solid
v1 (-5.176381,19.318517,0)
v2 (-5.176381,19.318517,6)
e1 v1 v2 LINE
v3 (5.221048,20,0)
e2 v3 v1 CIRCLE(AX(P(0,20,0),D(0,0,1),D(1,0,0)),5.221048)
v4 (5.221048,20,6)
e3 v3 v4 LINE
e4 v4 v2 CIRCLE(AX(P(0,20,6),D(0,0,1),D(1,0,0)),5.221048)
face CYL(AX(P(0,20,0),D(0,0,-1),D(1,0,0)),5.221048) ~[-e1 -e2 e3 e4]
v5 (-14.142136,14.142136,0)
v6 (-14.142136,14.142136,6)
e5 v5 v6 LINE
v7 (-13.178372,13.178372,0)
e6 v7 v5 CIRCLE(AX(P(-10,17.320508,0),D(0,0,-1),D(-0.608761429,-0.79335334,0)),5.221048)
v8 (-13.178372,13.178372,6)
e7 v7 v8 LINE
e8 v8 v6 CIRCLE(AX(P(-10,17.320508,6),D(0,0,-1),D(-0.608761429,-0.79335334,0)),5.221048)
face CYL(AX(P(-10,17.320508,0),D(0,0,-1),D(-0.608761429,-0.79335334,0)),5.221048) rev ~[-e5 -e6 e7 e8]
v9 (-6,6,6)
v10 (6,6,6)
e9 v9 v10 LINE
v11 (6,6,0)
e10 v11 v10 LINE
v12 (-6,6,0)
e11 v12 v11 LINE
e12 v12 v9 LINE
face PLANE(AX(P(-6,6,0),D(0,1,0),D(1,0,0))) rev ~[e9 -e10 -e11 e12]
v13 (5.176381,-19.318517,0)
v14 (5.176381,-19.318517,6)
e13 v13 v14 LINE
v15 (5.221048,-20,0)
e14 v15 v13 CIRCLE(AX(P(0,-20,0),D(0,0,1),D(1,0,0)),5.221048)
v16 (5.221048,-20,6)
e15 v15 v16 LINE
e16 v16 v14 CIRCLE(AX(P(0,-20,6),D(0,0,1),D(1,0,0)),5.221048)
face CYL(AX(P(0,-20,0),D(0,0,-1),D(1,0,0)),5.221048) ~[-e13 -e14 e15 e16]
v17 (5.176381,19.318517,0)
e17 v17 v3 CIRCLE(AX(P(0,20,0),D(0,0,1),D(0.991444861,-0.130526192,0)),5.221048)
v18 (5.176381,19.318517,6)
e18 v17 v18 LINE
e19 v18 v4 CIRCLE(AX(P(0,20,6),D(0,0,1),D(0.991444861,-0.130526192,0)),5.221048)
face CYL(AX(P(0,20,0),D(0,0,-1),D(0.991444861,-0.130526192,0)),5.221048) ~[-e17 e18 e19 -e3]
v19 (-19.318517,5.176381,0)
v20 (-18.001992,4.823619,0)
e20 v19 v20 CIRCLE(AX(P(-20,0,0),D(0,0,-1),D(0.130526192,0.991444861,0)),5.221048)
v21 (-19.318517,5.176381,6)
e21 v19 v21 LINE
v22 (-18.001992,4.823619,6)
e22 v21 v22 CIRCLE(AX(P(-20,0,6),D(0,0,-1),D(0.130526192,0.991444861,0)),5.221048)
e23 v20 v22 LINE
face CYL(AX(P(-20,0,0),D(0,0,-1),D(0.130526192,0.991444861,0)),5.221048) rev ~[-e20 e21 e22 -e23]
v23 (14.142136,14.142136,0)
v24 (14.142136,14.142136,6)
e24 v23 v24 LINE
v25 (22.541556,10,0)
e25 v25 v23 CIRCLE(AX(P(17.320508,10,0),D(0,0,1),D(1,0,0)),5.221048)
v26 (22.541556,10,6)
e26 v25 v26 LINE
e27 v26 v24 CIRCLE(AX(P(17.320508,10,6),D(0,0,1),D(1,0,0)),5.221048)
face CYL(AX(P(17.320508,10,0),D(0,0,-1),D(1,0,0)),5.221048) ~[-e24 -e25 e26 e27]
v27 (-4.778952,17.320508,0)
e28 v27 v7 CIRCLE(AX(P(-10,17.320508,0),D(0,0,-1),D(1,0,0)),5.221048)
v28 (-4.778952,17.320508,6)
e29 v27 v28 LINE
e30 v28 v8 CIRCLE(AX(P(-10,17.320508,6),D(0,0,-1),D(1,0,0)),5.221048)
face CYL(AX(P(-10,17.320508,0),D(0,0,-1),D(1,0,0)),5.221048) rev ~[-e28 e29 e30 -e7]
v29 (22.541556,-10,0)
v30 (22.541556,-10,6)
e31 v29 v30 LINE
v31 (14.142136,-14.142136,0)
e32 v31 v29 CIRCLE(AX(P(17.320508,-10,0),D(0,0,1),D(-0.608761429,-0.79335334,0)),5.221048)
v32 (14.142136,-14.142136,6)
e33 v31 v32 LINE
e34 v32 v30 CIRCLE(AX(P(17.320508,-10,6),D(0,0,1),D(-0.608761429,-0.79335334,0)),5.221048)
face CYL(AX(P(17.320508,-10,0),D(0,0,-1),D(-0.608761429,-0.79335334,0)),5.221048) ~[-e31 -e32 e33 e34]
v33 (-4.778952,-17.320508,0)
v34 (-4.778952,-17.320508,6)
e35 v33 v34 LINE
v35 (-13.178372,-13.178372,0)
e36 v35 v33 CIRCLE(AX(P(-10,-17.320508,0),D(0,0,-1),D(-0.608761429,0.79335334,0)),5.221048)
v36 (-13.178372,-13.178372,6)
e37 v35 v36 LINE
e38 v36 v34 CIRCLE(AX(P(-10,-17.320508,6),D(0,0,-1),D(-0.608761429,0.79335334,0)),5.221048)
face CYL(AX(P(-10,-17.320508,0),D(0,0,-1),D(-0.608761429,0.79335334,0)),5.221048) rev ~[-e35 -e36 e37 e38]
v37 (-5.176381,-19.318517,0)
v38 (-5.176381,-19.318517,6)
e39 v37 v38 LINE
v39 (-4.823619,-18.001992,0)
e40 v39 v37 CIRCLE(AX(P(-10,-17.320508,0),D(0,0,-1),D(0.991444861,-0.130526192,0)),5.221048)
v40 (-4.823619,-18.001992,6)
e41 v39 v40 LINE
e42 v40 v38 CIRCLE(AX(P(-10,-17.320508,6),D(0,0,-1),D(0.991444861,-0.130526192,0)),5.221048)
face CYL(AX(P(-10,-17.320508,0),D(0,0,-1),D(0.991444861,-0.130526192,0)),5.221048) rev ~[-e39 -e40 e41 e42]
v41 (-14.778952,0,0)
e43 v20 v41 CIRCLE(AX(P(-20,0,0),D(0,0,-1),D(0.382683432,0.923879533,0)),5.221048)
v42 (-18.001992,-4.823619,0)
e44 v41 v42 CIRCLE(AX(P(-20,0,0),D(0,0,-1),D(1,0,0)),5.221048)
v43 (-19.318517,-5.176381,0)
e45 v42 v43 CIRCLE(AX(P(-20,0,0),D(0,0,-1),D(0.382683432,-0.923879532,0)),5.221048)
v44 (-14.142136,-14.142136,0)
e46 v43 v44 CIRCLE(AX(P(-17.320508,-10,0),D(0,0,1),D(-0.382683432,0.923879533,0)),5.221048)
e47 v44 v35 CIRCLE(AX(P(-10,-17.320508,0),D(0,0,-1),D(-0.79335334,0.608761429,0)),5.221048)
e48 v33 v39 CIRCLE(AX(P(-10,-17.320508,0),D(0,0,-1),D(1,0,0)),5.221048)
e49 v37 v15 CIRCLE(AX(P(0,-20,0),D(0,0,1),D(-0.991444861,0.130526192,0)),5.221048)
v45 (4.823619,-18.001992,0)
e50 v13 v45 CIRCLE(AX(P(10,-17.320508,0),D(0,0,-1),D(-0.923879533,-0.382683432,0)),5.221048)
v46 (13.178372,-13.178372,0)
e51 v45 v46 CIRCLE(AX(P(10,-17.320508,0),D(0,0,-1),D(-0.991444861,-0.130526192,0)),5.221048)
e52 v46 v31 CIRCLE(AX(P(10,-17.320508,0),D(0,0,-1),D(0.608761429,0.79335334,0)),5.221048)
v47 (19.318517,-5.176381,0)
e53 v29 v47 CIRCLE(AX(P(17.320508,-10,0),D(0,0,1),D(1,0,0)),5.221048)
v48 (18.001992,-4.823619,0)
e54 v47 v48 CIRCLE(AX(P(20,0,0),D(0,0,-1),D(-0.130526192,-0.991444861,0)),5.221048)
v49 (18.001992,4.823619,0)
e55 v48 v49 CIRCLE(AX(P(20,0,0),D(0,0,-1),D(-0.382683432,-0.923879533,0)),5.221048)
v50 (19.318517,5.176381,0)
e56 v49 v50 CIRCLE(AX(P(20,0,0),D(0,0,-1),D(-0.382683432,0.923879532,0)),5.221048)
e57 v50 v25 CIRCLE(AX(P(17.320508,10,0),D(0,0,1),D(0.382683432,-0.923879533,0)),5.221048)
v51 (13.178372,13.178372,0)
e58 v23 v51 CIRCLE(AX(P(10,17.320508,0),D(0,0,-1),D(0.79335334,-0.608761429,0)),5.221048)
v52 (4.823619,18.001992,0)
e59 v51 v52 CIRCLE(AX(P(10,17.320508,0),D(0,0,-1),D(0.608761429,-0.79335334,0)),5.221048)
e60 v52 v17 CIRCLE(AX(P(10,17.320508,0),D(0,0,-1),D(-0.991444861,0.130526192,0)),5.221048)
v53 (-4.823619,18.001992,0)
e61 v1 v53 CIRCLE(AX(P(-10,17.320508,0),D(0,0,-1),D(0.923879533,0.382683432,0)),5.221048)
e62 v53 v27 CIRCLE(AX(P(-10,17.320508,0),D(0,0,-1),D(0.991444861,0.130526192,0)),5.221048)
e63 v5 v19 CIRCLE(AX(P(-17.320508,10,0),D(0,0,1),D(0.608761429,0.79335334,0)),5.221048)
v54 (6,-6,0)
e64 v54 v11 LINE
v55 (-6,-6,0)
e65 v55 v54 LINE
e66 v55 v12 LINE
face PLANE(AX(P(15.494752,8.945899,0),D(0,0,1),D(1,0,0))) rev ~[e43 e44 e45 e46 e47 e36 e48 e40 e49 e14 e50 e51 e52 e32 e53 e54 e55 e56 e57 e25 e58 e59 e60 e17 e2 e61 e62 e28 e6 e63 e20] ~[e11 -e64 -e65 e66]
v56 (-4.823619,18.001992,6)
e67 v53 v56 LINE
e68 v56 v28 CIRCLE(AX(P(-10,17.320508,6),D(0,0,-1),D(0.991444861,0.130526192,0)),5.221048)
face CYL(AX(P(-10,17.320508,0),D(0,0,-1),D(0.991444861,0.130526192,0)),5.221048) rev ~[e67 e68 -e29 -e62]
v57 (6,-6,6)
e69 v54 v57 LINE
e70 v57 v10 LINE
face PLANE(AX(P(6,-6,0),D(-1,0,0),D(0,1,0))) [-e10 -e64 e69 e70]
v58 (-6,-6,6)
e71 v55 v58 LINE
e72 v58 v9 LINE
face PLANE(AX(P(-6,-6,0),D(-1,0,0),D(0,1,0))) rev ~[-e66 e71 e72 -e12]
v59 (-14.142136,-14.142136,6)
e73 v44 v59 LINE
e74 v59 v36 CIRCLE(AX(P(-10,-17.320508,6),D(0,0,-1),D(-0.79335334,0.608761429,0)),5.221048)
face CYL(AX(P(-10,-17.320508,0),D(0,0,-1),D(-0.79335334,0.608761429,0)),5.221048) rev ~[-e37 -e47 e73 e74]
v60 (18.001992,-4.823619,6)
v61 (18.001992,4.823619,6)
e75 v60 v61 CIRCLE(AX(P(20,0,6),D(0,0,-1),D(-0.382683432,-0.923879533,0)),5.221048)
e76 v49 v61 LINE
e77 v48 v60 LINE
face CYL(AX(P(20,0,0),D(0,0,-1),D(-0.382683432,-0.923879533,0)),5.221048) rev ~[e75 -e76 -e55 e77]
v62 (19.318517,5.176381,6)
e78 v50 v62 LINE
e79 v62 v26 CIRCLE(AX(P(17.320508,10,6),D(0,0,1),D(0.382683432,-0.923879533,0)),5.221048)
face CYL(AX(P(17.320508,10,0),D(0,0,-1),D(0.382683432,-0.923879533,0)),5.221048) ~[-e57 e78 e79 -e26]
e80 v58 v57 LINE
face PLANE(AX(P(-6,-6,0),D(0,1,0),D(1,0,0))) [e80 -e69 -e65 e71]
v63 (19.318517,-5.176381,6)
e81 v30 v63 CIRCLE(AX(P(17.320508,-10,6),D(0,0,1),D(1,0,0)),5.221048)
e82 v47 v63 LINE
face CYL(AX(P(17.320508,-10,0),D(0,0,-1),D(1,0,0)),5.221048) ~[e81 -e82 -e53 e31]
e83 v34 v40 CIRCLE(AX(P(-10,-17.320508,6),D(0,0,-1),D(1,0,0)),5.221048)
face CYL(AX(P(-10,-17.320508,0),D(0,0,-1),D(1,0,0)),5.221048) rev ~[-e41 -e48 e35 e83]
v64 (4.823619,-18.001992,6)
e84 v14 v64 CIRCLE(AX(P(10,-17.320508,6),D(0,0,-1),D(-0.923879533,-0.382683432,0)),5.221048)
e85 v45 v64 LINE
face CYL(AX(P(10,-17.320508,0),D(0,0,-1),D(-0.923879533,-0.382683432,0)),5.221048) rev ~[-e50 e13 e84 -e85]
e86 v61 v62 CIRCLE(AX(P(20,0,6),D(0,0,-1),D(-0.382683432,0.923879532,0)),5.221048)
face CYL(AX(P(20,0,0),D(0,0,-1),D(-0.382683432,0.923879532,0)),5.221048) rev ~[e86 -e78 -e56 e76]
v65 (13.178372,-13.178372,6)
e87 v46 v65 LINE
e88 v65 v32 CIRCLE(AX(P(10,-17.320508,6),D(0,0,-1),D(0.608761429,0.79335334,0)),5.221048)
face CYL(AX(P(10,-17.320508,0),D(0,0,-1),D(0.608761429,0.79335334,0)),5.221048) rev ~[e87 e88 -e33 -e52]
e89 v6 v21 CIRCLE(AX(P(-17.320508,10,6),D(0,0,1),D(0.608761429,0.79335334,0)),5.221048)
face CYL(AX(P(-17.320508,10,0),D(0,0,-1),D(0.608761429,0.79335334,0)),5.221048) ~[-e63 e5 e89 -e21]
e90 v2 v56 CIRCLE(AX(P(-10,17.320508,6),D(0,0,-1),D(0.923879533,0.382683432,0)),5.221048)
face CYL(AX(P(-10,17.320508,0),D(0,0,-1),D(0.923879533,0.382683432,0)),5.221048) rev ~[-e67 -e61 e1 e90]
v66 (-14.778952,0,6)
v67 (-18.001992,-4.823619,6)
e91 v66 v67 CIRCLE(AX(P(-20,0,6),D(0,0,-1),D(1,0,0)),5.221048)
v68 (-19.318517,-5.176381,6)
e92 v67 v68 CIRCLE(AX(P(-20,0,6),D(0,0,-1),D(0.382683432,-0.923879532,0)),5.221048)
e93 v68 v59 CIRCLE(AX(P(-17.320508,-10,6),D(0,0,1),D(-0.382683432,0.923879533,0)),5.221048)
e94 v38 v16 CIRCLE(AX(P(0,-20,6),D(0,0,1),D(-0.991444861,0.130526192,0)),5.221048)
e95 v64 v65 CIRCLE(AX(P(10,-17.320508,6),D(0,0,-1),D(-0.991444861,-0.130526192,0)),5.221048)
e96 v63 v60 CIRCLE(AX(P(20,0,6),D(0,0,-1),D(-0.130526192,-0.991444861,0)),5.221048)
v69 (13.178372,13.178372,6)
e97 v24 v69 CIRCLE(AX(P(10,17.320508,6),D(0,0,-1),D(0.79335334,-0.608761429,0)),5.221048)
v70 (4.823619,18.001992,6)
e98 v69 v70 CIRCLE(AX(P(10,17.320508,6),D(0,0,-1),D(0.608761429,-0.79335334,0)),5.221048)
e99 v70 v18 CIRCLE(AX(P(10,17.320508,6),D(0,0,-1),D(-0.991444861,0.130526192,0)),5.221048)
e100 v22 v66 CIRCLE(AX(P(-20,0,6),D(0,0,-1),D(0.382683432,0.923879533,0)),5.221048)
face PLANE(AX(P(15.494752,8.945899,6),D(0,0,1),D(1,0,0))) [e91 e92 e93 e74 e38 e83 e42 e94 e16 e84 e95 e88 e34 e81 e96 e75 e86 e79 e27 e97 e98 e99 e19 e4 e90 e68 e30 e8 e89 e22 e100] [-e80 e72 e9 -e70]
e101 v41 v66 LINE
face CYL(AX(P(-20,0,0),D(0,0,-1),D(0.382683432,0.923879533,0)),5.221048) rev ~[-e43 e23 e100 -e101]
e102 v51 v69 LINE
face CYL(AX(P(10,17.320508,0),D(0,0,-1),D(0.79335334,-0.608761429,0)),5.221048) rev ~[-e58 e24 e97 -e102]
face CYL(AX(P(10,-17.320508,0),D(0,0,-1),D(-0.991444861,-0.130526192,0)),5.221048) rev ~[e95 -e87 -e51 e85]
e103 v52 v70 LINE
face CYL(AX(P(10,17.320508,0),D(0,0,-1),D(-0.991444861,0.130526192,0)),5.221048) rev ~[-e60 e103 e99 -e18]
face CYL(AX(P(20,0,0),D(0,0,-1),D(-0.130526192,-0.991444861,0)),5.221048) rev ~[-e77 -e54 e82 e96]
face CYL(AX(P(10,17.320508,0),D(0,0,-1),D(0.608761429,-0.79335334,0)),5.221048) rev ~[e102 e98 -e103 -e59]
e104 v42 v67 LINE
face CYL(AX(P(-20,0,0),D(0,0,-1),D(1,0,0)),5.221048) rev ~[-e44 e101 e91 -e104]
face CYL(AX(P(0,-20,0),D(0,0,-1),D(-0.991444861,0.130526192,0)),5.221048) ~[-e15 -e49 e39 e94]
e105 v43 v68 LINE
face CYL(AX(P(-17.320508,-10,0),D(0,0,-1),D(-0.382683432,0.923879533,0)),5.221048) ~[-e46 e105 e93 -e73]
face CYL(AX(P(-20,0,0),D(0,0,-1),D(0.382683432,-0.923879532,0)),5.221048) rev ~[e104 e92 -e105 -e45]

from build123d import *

# Parameters (mm, degrees)
F0_W     = 12
F0_H     = 12
F1_DEPTH = 6


with BuildPart() as f1:
    # F0 (on Top) → F1 (new body)
    with BuildSketch(Plane.XY):
        with BuildLine():
            ThreePointArc((18.0019915499, 4.8236190979), (18.6486934227, 5.0431448029), (19.3185165258, 5.1763809021))
            ThreePointArc((19.3185165258, 5.1763809021), (17.3205080757, 10), (14.1421356237, 14.1421356237))
            ThreePointArc((14.1421356237, 14.1421356237), (13.6918382257, 13.62866985), (13.178372452, 13.178372452))
            ThreePointArc((13.178372452, 13.178372452), (12.7989481428, 7.3894761556), (18.0019915499, 4.8236190979))
        make_face()
        with BuildLine():
            ThreePointArc((14.1421356237, 14.1421356237), (17.3205080757, 10), (19.3185165258, 5.1763809021))
            ThreePointArc((19.3185165258, 5.1763809021), (21.6616505733, 7.0993413189), (22.5415557645, 10))
            ThreePointArc((22.5415557645, 10), (19.6297184195, 14.6826153543), (14.1421356237, 14.1421356237))
        make_face()
        with BuildLine():
            ThreePointArc((22.5415557645, -10), (21.6616505733, -7.0993413189), (19.3185165258, -5.1763809021))
            ThreePointArc((19.3185165258, -5.1763809021), (17.3205080757, -10), (14.1421356237, -14.1421356237))
            ThreePointArc((14.1421356237, -14.1421356237), (19.6297184195, -14.6826153543), (22.5415557645, -10))
        make_face()
        with BuildLine():
            ThreePointArc((14.1421356237, -14.1421356237), (17.3205080757, -10), (19.3185165258, -5.1763809021))
            ThreePointArc((19.3185165258, -5.1763809021), (18.6486934227, -5.0431448029), (18.0019915499, -4.8236190979))
            ThreePointArc((18.0019915499, -4.8236190979), (12.7989481428, -7.3894761556), (13.178372452, -13.178372452))
            ThreePointArc((13.178372452, -13.178372452), (13.6918382257, -13.62866985), (14.1421356237, -14.1421356237))
        make_face()
        with BuildLine():
            ThreePointArc((18.0019915499, -4.8236190979), (14.7789523112, 0), (18.0019915499, 4.8236190979))
            ThreePointArc((18.0019915499, 4.8236190979), (12.7989481428, 7.3894761556), (13.178372452, 13.178372452))
            ThreePointArc((13.178372452, 13.178372452), (7.3894761556, 12.7989481428), (4.8236190979, 18.0019915499))
            ThreePointArc((4.8236190979, 18.0019915499), (0, 14.7789523112), (-4.8236190979, 18.0019915499))
            ThreePointArc((-4.8236190979, 18.0019915499), (-4.7901309751, 17.6619809324), (-4.7789523112, 17.3205080757))
            ThreePointArc((-4.7789523112, 17.3205080757), (-7.6907896561, 12.6378927214), (-13.178372452, 13.178372452))
            ThreePointArc((-13.178372452, 13.178372452), (-12.3765407116, 11.6782507774), (-12.0994603869, 10))
            ThreePointArc((-12.0994603869, 10), (-13.8780321316, 6.0746085108), (-18.0019915499, 4.8236190979))
            ThreePointArc((-18.0019915499, 4.8236190979), (-15.6588575024, 2.9006586811), (-14.7789523112, 0))
            ThreePointArc((-14.7789523112, 0), (-15.6588575024, -2.9006586811), (-18.0019915499, -4.8236190979))
            ThreePointArc((-18.0019915499, -4.8236190979), (-13.8780321316, -6.0746085108), (-12.0994603869, -10))
            ThreePointArc((-12.0994603869, -10), (-12.3765407116, -11.6782507774), (-13.178372452, -13.178372452))
            ThreePointArc((-13.178372452, -13.178372452), (-7.6907896561, -12.6378927214), (-4.7789523112, -17.3205080757))
            ThreePointArc((-4.7789523112, -17.3205080757), (-4.7901309751, -17.6619809324), (-4.8236190979, -18.0019915499))
            ThreePointArc((-4.8236190979, -18.0019915499), (0, -14.7789523112), (4.8236190979, -18.0019915499))
            ThreePointArc((4.8236190979, -18.0019915499), (7.3894761556, -12.7989481428), (13.178372452, -13.178372452))
            ThreePointArc((13.178372452, -13.178372452), (12.7989481428, -7.3894761556), (18.0019915499, -4.8236190979))
        make_face()
        Rectangle(F0_W, F0_H, mode=Mode.SUBTRACT)
        with BuildLine():
            ThreePointArc((4.8236190979, 18.0019915499), (4.9568551971, 18.6718146529), (5.1763809021, 19.3185165258))
            ThreePointArc((5.1763809021, 19.3185165258), (0, 20), (-5.1763809021, 19.3185165258))
            ThreePointArc((-5.1763809021, 19.3185165258), (-4.9568551971, 18.6718146529), (-4.8236190979, 18.0019915499))
            ThreePointArc((-4.8236190979, 18.0019915499), (0, 14.7789523112), (4.8236190979, 18.0019915499))
        make_face()
        with BuildLine():
            ThreePointArc((-5.1763809021, 19.3185165258), (0, 20), (5.1763809021, 19.3185165258))
            ThreePointArc((5.1763809021, 19.3185165258), (5.2098690249, 19.6585271433), (5.2210476888, 20))
            ThreePointArc((5.2210476888, 20), (-0.3414728567, 25.2098690249), (-5.1763809021, 19.3185165258))
        make_face()
        with BuildLine():
            ThreePointArc((5.2210476888, -20), (5.2098690249, -19.6585271433), (5.1763809021, -19.3185165258))
            ThreePointArc((5.1763809021, -19.3185165258), (0, -20), (-5.1763809021, -19.3185165258))
            ThreePointArc((-5.1763809021, -19.3185165258), (-0.3414728567, -25.2098690249), (5.2210476888, -20))
        make_face()
        with BuildLine():
            ThreePointArc((-5.1763809021, -19.3185165258), (0, -20), (5.1763809021, -19.3185165258))
            ThreePointArc((5.1763809021, -19.3185165258), (4.9568551971, -18.6718146529), (4.8236190979, -18.0019915499))
            ThreePointArc((4.8236190979, -18.0019915499), (0, -14.7789523112), (-4.8236190979, -18.0019915499))
            ThreePointArc((-4.8236190979, -18.0019915499), (-4.9568551971, -18.6718146529), (-5.1763809021, -19.3185165258))
        make_face()
        with BuildLine():
            ThreePointArc((-13.178372452, 13.178372452), (-13.6918382257, 13.62866985), (-14.1421356237, 14.1421356237))
            ThreePointArc((-14.1421356237, 14.1421356237), (-17.3205080757, 10), (-19.3185165258, 5.1763809021))
            ThreePointArc((-19.3185165258, 5.1763809021), (-18.6486934227, 5.0431448029), (-18.0019915499, 4.8236190979))
            ThreePointArc((-18.0019915499, 4.8236190979), (-13.8780321316, 6.0746085108), (-12.0994603869, 10))
            ThreePointArc((-12.0994603869, 10), (-12.3765407116, 11.6782507774), (-13.178372452, 13.178372452))
        make_face()
        with BuildLine():
            ThreePointArc((-19.3185165258, 5.1763809021), (-17.3205080757, 10), (-14.1421356237, 14.1421356237))
            ThreePointArc((-14.1421356237, 14.1421356237), (-21.8420680086, 12.6105238444), (-19.3185165258, 5.1763809021))
        make_face()
        with BuildLine():
            ThreePointArc((-19.3185165258, -5.1763809021), (-21.8420680086, -12.6105238444), (-14.1421356237, -14.1421356237))
            ThreePointArc((-14.1421356237, -14.1421356237), (-17.3205080757, -10), (-19.3185165258, -5.1763809021))
        make_face()
        with BuildLine():
            ThreePointArc((-19.3185165258, -5.1763809021), (-17.3205080757, -10), (-14.1421356237, -14.1421356237))
            ThreePointArc((-14.1421356237, -14.1421356237), (-13.6918382257, -13.62866985), (-13.178372452, -13.178372452))
            ThreePointArc((-13.178372452, -13.178372452), (-12.3765407116, -11.6782507774), (-12.0994603869, -10))
            ThreePointArc((-12.0994603869, -10), (-13.8780321316, -6.0746085108), (-18.0019915499, -4.8236190979))
            ThreePointArc((-18.0019915499, -4.8236190979), (-18.6486934227, -5.0431448029), (-19.3185165258, -5.1763809021))
        make_face()
    extrude(amount=F1_DEPTH)


solid = f1.part
